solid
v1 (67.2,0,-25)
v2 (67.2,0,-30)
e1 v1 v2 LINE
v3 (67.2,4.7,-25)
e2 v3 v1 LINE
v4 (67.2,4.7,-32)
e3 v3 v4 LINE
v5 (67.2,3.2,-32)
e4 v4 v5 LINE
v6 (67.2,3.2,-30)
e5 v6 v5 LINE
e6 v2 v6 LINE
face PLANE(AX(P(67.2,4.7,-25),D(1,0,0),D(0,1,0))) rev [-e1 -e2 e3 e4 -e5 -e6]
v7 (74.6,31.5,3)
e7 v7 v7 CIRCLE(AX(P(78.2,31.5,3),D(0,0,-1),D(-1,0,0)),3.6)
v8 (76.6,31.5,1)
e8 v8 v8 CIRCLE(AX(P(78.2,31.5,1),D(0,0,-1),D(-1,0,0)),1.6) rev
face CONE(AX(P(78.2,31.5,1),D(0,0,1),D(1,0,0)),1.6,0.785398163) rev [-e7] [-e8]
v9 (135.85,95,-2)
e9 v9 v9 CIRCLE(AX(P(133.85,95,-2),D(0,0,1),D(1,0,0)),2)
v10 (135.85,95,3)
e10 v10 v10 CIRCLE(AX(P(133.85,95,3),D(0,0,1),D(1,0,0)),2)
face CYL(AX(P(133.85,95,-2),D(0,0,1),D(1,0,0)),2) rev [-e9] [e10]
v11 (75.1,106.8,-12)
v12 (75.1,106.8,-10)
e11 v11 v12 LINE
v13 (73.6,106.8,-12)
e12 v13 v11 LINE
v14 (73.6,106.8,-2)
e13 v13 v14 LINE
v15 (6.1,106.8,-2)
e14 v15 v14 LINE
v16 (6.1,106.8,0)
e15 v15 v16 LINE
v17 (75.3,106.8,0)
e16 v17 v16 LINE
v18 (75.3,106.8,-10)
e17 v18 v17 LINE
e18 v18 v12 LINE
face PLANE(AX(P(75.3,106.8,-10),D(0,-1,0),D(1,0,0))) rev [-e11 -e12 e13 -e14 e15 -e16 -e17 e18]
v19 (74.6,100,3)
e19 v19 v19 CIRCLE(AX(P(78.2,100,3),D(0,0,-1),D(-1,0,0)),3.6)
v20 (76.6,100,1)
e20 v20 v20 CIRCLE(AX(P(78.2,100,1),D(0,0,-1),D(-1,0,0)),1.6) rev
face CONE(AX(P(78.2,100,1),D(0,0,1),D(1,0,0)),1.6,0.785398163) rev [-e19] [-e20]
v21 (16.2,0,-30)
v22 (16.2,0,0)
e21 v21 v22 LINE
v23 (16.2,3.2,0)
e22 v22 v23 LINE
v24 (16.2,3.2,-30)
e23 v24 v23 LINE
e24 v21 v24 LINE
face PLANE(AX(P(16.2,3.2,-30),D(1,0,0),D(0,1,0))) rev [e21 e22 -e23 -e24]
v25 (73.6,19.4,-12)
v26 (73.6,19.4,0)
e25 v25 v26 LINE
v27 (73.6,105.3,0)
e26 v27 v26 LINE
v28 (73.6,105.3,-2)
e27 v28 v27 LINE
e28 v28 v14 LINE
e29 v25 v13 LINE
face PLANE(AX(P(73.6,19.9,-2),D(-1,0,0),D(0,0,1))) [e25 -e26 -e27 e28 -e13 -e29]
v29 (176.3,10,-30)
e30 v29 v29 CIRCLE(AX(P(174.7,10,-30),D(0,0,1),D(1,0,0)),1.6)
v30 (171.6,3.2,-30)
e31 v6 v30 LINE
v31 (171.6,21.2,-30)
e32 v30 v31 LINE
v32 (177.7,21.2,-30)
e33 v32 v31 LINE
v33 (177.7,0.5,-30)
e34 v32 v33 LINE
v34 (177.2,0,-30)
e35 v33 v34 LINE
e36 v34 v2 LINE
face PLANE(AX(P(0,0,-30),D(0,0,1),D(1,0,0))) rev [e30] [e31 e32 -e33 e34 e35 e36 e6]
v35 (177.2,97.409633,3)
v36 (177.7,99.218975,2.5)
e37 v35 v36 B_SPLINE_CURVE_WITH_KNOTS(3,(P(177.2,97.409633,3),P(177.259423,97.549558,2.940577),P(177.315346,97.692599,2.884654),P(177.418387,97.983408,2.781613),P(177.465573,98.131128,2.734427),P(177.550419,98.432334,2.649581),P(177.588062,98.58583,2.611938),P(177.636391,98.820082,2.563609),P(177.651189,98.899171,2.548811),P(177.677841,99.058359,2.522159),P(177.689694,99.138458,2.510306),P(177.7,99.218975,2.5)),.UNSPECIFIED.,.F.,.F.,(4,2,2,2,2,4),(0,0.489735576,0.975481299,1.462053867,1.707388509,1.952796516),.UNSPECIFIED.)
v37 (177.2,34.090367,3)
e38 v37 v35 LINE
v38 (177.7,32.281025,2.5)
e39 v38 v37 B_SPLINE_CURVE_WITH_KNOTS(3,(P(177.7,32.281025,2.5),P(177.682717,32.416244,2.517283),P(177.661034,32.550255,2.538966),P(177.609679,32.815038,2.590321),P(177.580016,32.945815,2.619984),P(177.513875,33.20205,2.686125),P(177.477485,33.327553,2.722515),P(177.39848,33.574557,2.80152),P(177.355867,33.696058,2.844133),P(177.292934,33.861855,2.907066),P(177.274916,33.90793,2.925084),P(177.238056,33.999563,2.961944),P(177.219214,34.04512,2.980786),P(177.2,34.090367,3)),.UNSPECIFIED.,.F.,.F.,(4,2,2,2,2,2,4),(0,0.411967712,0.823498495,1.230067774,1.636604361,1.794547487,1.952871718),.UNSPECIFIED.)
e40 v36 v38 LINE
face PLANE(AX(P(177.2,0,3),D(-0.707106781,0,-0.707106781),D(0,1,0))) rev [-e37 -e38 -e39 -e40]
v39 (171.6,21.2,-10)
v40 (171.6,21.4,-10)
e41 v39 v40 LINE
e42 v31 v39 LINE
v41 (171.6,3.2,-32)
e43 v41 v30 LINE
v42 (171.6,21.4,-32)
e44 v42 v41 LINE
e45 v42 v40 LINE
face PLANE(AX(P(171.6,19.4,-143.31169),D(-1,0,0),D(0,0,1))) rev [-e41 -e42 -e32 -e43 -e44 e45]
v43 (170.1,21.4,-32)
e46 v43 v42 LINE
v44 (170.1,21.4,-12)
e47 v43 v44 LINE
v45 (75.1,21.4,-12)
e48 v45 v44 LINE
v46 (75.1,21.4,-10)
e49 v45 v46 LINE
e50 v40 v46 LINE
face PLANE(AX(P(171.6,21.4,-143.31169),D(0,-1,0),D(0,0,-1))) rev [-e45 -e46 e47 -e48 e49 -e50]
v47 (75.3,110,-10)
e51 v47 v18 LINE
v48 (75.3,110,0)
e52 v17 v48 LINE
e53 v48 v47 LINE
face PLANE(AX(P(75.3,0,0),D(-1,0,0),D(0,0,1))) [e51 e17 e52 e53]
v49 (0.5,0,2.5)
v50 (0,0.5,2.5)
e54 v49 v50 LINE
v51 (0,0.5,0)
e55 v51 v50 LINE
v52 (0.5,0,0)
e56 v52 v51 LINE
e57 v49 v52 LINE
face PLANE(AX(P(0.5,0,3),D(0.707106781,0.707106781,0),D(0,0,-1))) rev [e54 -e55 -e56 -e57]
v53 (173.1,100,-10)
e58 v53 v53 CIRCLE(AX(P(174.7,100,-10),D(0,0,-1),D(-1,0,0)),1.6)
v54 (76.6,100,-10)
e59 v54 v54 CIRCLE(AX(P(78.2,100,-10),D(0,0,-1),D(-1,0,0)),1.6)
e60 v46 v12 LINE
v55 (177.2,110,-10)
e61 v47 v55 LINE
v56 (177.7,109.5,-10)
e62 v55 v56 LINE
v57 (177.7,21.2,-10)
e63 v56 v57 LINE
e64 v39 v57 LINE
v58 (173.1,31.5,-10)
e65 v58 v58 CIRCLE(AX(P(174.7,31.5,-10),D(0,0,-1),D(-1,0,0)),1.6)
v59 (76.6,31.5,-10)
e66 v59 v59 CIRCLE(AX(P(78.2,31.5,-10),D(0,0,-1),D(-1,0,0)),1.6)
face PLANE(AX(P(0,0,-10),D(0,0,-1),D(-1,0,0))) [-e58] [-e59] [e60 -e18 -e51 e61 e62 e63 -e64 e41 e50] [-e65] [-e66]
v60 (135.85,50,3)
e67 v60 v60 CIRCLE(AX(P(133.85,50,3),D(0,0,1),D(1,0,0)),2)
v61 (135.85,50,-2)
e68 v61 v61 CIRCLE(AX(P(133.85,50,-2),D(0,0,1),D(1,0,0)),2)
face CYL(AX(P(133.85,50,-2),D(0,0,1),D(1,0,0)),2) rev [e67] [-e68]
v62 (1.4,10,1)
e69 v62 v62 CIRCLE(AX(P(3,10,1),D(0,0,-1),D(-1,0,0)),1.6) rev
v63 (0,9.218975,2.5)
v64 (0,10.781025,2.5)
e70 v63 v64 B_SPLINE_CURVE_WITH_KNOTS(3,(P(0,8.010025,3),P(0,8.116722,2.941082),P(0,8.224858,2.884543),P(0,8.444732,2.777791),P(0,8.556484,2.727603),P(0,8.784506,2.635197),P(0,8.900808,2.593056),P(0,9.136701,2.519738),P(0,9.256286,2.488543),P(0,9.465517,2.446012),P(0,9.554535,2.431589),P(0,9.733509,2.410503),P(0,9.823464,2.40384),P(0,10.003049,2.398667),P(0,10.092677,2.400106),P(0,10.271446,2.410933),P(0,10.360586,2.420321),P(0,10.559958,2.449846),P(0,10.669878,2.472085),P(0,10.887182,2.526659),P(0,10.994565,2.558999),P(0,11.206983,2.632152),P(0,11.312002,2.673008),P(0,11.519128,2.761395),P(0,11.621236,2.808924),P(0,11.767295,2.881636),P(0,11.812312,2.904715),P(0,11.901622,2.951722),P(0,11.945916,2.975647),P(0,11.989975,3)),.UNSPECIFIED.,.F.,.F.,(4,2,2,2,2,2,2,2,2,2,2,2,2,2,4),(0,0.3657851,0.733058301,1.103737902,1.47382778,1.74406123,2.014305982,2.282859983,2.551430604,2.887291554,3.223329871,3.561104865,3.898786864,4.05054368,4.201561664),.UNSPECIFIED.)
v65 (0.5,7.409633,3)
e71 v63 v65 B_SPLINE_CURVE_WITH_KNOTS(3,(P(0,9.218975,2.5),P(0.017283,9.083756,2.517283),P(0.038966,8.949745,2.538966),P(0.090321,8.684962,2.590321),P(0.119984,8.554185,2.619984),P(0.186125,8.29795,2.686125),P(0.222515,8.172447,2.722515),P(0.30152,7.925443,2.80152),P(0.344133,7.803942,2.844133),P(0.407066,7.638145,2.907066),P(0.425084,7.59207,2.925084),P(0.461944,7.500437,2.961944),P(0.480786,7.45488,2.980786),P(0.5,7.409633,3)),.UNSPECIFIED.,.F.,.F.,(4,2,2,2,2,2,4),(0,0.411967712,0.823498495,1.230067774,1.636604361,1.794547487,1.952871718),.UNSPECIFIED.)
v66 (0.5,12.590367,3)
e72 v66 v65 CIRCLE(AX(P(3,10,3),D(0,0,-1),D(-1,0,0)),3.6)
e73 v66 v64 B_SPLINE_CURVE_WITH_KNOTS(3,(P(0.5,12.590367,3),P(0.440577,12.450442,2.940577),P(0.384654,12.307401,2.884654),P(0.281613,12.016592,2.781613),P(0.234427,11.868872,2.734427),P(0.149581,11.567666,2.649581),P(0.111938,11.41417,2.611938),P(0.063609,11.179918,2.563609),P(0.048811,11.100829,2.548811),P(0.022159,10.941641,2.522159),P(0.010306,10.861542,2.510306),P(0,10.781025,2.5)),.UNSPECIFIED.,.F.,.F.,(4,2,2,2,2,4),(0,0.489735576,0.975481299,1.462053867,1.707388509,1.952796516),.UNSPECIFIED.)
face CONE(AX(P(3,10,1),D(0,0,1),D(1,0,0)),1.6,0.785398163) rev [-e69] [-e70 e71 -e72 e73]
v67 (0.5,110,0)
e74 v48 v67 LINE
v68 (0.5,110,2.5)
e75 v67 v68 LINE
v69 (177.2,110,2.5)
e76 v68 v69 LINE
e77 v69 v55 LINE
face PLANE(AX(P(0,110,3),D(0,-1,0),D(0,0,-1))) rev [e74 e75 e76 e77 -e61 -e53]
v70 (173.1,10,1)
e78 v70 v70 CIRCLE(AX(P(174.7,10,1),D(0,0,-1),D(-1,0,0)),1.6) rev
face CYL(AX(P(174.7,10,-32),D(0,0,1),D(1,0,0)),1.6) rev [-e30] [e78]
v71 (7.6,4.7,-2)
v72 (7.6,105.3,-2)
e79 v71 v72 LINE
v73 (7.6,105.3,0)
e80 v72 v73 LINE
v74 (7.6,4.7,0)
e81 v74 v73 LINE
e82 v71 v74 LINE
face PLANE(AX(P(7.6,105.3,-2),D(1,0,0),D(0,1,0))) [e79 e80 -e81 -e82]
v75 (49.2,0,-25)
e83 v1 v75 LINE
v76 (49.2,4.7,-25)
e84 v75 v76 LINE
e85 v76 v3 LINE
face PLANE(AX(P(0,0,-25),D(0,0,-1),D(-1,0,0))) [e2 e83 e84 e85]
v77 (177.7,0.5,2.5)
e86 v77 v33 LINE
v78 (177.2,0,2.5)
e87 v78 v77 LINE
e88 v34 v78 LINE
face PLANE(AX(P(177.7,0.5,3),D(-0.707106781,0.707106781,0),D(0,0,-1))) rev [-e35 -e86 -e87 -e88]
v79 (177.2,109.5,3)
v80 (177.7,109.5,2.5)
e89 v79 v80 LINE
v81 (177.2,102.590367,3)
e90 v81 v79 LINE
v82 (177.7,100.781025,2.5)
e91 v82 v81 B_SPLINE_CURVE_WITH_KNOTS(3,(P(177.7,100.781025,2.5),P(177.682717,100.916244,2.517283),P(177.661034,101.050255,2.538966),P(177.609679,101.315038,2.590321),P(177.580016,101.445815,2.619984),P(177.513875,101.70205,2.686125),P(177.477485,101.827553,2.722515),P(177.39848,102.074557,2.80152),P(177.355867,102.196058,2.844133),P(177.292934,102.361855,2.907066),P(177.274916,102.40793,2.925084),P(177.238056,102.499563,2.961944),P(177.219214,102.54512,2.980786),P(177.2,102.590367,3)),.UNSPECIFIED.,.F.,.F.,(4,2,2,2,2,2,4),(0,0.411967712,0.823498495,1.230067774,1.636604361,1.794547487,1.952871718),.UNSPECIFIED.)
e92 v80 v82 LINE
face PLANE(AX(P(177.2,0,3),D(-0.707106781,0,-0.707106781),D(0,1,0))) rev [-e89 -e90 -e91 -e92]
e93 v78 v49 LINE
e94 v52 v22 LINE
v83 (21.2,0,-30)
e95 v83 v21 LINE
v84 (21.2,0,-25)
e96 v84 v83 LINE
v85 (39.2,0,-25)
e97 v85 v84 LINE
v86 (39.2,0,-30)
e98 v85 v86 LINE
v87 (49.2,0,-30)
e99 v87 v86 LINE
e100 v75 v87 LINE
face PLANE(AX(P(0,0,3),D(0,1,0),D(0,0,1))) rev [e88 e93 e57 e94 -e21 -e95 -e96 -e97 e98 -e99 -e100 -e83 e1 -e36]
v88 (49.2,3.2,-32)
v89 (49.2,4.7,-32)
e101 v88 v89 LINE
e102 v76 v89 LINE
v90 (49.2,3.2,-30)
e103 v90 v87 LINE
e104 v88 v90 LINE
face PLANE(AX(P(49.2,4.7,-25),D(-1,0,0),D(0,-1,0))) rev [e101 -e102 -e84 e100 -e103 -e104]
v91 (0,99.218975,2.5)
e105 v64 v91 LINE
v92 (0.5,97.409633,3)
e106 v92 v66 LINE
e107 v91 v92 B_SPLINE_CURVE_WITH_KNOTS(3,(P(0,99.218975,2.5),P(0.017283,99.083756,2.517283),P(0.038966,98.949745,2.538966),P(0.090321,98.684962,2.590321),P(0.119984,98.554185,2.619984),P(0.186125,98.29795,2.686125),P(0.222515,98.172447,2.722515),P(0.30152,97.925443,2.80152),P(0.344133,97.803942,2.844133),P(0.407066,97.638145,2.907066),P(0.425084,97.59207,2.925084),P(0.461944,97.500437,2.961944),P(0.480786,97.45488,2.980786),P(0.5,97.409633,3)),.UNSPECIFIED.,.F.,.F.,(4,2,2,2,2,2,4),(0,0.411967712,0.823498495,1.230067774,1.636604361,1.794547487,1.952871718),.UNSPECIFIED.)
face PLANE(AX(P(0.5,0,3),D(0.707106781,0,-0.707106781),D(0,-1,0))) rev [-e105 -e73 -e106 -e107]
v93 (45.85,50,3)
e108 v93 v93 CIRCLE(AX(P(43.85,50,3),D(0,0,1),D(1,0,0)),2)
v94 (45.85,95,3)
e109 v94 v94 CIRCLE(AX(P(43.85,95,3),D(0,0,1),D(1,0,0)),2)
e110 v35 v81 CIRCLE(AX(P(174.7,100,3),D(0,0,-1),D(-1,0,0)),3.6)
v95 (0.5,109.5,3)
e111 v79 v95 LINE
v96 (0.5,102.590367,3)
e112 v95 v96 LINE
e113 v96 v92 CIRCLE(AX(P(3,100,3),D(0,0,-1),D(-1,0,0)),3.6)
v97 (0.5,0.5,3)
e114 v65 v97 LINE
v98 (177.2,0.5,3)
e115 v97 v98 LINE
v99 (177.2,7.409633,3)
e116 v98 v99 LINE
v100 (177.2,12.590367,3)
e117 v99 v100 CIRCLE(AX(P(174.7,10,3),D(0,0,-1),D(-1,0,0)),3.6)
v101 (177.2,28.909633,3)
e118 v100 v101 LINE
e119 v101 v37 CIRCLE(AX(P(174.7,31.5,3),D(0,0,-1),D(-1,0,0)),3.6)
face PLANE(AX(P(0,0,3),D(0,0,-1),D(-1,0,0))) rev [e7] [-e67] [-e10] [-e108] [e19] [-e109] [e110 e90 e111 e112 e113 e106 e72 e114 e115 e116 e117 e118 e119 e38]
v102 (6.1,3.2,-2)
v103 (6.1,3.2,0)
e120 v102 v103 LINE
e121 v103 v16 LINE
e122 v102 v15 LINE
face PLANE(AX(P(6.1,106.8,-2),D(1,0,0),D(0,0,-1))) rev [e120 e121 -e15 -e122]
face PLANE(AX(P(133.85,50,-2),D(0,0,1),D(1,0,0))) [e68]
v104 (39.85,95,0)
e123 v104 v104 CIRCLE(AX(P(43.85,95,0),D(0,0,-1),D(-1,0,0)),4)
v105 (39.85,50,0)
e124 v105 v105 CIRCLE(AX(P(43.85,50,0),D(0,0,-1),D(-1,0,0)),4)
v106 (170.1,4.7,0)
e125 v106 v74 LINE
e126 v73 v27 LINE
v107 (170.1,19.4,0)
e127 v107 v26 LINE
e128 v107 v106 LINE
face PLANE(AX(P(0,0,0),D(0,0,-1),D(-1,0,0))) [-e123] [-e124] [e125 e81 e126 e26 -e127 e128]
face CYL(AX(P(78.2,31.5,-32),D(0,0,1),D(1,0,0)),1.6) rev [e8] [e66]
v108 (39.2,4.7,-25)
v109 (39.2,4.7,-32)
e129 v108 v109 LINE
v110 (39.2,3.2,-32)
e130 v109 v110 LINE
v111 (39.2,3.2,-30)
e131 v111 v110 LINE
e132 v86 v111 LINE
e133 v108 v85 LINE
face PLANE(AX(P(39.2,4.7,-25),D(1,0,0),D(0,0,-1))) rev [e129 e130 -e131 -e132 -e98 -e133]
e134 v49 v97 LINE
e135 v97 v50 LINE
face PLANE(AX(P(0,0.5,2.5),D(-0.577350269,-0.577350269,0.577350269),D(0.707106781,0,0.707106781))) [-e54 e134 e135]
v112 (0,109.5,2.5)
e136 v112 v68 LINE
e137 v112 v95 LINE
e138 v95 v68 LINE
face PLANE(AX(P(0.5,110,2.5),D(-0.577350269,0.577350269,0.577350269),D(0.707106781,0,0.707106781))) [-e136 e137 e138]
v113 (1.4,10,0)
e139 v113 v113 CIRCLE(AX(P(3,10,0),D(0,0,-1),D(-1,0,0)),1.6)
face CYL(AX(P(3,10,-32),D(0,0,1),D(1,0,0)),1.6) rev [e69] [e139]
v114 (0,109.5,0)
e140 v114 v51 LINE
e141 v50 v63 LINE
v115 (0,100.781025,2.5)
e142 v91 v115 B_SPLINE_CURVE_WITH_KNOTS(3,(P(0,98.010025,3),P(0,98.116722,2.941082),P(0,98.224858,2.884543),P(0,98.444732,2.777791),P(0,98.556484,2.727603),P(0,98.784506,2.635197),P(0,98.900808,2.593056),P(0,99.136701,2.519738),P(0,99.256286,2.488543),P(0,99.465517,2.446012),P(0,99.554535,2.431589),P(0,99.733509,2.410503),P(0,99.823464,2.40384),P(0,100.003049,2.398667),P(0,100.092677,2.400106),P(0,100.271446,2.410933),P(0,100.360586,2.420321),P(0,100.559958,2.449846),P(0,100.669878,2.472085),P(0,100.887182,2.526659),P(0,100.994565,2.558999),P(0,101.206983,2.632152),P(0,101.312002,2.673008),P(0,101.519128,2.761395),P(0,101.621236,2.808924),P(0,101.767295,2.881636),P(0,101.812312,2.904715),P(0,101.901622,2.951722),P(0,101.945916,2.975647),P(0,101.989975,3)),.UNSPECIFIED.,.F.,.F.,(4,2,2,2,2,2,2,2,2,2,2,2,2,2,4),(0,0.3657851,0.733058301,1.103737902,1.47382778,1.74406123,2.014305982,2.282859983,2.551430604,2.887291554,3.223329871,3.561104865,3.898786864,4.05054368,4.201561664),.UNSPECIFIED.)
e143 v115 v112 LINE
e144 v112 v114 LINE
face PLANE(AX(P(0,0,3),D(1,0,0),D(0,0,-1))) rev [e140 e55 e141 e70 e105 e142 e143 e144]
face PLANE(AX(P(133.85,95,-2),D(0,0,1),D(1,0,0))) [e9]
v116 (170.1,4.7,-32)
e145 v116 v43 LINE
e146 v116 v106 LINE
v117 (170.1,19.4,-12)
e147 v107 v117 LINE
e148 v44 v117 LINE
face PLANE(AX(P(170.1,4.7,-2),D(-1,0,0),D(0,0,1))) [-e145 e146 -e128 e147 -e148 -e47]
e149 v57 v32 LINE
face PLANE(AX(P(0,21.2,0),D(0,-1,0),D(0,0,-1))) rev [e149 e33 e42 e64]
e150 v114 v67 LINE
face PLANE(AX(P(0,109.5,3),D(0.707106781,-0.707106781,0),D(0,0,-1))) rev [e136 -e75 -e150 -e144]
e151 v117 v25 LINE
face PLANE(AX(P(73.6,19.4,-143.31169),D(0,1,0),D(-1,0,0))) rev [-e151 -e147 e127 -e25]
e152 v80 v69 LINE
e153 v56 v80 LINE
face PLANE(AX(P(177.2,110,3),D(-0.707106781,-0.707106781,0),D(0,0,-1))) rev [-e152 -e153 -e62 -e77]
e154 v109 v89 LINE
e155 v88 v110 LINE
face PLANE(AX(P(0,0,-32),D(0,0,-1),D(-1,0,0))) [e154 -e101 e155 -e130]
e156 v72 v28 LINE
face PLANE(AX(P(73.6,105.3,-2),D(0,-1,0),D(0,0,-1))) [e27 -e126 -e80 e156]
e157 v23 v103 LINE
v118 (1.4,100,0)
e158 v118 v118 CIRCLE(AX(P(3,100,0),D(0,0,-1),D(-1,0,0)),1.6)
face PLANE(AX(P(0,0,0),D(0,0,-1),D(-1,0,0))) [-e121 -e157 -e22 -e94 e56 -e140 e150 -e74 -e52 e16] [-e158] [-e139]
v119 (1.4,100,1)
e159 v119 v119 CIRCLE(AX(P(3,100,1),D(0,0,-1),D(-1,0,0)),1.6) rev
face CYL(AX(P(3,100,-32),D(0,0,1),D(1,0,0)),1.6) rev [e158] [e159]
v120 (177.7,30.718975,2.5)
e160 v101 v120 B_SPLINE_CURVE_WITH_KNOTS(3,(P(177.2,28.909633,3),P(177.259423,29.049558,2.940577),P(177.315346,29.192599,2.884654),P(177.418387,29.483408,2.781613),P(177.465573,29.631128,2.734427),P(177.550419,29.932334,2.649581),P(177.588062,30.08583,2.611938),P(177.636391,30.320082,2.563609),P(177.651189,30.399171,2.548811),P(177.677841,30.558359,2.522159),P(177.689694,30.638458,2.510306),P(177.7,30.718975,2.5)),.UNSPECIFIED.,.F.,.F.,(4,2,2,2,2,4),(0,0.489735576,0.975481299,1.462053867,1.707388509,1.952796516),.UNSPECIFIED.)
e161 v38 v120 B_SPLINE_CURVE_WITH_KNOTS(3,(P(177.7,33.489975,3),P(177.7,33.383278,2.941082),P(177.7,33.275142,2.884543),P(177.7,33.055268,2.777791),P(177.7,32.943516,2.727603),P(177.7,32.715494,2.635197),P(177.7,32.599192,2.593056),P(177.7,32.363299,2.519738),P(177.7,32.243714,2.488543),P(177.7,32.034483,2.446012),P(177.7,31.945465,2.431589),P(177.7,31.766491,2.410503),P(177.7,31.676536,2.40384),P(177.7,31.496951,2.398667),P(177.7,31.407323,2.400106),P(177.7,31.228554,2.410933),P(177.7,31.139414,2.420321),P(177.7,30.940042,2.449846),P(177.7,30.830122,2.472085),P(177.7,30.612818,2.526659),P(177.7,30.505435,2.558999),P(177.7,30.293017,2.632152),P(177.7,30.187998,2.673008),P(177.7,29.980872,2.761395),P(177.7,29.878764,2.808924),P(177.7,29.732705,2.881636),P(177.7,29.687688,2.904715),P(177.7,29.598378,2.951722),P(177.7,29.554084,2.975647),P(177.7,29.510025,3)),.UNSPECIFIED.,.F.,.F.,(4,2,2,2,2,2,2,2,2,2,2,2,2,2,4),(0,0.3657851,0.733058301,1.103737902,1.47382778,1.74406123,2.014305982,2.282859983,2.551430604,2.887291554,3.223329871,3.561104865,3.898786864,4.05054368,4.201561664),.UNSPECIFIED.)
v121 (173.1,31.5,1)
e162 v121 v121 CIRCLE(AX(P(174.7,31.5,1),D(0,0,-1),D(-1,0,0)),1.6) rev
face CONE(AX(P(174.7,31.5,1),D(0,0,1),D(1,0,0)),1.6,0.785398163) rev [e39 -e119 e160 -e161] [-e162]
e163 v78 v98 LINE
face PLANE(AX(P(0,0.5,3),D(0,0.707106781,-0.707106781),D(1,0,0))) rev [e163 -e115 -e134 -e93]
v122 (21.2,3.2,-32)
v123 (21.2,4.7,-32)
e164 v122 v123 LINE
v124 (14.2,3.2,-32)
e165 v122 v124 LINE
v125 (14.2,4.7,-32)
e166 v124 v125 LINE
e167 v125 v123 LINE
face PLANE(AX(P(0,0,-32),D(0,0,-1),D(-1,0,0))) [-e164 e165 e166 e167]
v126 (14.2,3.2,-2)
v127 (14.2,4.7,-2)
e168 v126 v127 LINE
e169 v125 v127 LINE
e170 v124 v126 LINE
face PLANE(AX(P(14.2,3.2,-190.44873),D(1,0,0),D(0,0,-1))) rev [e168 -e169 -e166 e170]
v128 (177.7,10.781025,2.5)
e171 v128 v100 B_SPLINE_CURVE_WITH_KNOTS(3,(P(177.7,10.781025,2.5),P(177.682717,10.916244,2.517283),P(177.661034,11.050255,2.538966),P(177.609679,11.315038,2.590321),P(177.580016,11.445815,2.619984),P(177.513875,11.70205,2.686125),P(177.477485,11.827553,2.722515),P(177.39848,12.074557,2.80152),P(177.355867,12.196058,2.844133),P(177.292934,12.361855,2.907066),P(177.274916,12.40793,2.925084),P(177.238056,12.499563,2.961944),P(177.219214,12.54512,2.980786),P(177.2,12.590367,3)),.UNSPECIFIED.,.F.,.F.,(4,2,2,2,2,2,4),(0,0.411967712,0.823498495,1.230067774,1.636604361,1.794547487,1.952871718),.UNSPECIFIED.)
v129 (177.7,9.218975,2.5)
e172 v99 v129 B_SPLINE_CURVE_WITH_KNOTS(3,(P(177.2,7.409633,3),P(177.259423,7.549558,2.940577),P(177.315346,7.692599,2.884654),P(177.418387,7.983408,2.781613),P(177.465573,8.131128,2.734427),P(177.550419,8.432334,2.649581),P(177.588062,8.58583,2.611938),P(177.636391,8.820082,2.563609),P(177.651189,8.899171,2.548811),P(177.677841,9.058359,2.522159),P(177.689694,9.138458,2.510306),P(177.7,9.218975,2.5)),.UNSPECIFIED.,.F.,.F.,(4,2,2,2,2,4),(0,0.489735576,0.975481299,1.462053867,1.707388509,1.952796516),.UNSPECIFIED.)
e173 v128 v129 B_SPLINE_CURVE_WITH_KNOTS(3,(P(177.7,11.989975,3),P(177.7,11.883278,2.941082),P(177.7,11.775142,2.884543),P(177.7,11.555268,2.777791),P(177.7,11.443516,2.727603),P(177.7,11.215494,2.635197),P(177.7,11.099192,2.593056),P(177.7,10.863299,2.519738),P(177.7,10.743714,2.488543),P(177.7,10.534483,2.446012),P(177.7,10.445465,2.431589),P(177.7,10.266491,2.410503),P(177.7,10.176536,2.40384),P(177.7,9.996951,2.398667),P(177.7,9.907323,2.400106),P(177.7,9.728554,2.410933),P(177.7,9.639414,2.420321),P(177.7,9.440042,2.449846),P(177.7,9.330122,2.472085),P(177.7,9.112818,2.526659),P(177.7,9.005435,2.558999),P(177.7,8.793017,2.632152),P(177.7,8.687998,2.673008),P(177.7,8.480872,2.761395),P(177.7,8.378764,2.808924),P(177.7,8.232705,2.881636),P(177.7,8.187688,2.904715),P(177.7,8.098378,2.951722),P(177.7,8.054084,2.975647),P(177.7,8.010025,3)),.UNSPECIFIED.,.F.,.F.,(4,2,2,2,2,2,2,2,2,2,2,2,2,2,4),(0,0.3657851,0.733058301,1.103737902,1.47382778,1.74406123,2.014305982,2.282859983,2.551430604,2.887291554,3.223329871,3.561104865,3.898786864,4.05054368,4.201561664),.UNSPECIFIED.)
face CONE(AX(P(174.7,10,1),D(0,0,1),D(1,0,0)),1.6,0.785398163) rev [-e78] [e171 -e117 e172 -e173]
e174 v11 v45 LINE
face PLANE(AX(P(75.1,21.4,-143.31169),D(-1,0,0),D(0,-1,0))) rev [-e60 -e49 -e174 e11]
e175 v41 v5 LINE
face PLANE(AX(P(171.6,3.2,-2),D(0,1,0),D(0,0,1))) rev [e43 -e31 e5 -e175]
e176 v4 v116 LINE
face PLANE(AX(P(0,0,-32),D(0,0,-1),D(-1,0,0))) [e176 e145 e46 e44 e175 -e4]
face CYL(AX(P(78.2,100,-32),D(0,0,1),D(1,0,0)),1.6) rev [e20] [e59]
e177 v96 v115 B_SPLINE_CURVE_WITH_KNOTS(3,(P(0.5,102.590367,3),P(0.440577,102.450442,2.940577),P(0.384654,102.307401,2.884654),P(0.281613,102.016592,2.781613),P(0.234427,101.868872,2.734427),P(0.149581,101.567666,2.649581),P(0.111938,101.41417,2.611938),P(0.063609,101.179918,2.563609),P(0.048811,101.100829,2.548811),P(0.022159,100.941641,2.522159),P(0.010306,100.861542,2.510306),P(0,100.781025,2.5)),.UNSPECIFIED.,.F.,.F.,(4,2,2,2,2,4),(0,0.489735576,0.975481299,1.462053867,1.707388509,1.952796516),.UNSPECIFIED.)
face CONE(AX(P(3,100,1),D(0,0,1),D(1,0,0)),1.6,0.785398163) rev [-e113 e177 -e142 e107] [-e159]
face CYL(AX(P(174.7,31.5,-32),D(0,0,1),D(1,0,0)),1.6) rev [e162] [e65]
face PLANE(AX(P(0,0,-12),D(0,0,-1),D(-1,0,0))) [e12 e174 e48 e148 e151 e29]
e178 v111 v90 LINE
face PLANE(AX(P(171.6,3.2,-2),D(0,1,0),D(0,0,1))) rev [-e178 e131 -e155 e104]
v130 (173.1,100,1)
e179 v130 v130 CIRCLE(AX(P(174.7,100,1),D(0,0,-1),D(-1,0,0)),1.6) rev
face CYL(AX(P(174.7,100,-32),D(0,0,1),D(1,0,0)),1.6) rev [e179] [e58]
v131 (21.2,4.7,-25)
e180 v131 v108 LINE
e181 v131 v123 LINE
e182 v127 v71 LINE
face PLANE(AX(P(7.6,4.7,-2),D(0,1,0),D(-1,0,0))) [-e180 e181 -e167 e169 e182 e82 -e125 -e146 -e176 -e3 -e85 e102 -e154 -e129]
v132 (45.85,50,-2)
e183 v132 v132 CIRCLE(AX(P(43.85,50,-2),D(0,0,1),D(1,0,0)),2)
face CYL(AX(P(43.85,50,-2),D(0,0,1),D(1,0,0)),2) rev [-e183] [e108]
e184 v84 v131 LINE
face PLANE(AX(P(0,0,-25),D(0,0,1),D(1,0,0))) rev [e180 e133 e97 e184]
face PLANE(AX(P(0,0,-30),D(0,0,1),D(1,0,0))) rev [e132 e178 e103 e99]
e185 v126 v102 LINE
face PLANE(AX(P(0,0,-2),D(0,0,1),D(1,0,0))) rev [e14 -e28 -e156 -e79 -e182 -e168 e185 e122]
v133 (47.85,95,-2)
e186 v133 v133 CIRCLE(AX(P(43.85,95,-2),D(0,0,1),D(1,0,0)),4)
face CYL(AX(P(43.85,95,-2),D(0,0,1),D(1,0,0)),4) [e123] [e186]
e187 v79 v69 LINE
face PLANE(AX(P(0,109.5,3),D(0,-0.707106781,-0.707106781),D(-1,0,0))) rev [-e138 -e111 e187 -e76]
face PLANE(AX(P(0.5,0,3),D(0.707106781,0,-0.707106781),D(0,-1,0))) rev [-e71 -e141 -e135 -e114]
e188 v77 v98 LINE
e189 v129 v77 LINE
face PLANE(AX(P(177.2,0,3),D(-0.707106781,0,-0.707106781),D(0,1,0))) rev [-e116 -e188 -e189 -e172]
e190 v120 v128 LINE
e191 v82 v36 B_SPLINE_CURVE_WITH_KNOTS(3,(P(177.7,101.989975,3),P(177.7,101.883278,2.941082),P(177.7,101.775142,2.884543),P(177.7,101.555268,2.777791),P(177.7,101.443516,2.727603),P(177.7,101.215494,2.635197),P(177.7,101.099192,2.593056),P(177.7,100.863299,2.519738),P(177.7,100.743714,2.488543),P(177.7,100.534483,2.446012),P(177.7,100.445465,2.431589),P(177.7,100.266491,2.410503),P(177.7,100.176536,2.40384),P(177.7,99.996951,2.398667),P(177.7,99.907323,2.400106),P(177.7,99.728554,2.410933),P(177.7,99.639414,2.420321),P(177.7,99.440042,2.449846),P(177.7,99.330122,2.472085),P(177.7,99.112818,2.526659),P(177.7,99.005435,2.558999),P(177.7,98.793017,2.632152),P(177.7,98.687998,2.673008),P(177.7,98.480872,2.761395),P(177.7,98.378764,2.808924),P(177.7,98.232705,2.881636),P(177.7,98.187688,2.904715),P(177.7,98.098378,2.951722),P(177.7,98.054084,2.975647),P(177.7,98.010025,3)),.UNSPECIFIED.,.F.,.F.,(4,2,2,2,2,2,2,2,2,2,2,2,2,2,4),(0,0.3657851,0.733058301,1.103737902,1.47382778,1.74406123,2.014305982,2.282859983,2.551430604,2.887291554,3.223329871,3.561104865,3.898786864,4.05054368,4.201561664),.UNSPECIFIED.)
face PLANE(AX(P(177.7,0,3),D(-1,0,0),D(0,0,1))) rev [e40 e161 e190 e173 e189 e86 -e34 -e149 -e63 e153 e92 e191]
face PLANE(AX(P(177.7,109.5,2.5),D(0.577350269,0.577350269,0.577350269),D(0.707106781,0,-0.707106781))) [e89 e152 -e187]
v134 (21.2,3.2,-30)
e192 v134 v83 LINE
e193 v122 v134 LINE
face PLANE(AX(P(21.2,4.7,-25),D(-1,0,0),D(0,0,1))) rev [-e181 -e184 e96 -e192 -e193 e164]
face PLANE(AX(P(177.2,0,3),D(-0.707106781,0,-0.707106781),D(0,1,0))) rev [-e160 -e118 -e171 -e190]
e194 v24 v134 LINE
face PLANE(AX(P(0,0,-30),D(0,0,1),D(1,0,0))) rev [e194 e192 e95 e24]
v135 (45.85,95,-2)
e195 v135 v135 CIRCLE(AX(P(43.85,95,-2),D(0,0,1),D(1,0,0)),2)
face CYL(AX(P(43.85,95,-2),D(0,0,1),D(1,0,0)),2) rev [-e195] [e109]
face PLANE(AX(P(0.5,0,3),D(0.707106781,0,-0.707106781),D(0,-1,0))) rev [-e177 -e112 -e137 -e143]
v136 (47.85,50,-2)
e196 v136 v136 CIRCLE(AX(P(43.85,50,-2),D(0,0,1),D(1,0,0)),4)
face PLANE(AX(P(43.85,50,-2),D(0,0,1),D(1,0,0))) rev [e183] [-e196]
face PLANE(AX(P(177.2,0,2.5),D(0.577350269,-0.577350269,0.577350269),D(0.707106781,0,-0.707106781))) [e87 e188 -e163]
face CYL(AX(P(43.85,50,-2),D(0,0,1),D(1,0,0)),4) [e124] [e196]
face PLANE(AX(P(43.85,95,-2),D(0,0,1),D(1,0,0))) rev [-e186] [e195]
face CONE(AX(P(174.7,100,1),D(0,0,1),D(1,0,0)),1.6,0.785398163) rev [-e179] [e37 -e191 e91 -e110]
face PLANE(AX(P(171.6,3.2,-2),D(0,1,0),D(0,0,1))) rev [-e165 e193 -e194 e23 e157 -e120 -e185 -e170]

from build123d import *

# Parameters (mm, degrees)
ESQUISSE1_W             = 177.7
ESQUISSE1_H             = 110
BOSS_EXTRU_1_DEPTH      = 3
ESQUISSE2_W             = 102.6
ESQUISSE2_H             = 88.6
BOSS_EXTRU_2_DEPTH      = 10
BOSS_EXTRU_3_DEPTH      = 30
ESQUISSE4_W             = 6.1
ESQUISSE4_H             = 20
ENL_V_MAT_EXTRU_1_DEPTH = 0.2
ESQUISSE5_W             = 10
ESQUISSE5_H             = 3.2
ENL_V_MAT_EXTRU_2_DEPTH = 0.2
BOSS_EXTRU_4_DEPTH      = 2
BOSS_EXTRU_5_DEPTH      = 10
BOSS_EXTRU_6_DEPTH      = 30
ESQUISSE9_R             = 1.6
ENL_V_MAT_EXTRU_3_DEPTH = 212.901604524
CHANFREIN1_SIZE         = 2
CHANFREIN2_SIZE         = 0.5
ESQUISSE10_R            = 2
ENL_V_MAT_EXTRU_4_DEPTH = 5
ESQUISSE11_R            = 4
ESQUISSE11_R_2          = 2
BOSS_EXTRU_7_DEPTH      = 5
ESQUISSE13_W            = 18
ESQUISSE13_H            = 4.7
ENL_V_MAT_EXTRU_5_DEPTH = 7
ESQUISSE14_W            = 96.5
ESQUISSE14_H            = 0.5
BOSS_EXTRU_8_DEPTH      = 2


with BuildPart() as part:
    # Esquisse1 → Boss.-Extru.1 (new body)
    with BuildSketch(Plane.XY):
        with Locations((88.85, 55)):
            Rectangle(ESQUISSE1_W, ESQUISSE1_H)
    extrude(amount=BOSS_EXTRU_1_DEPTH)

    # Esquisse2 → Boss.-Extru.2 (add)
    with BuildSketch(Plane(origin=(0, 0, 0), x_dir=(-1, 0, 0), z_dir=(0, 0, -1))):
        with Locations((-126.4, 65.7)):
            Rectangle(ESQUISSE2_W, ESQUISSE2_H)
    extrude(amount=BOSS_EXTRU_2_DEPTH)

    # Esquisse3 → Boss.-Extru.3 (add)
    with BuildSketch(Plane(origin=(0, 0, 0), x_dir=(-1, 0, 0), z_dir=(0, 0, -1))):
        Polygon((-177.7, 21.4), (-171.6, 21.4), (-171.6, 3.2), (-16.2, 3.2), (-16.2, 0), (-177.7, 0), align=None)
    extrude(amount=BOSS_EXTRU_3_DEPTH)

    # Esquisse4 → Enlèv. mat.-Extru.1 (cut)
    with BuildSketch(Plane(origin=(0, 21.4, 0), x_dir=(1, 0, 0), z_dir=(0, 1, 0))):
        with Locations((174.65, 20)):
            Rectangle(ESQUISSE4_W, ESQUISSE4_H)
    extrude(amount=-ENL_V_MAT_EXTRU_1_DEPTH, mode=Mode.SUBTRACT)

    # Esquisse5 → Enlèv. mat.-Extru.2 (cut)
    with BuildSketch(Plane.ZY.offset(-75.1)):
        with Locations((-5, 108.4)):
            Rectangle(ESQUISSE5_W, ESQUISSE5_H)
    extrude(amount=-ENL_V_MAT_EXTRU_2_DEPTH, mode=Mode.SUBTRACT)

    # Esquisse6 → Boss.-Extru.4 (add)
    with BuildSketch(Plane(origin=(0, 0, 0), x_dir=(-1, 0, 0), z_dir=(0, 0, -1))):
        Polygon((-75.1, 106.8), (-6.1, 106.8), (-6.1, 3.2), (-171.6, 3.2), (-171.6, 21.4), (-75.1, 21.4), align=None)
        Polygon((-73.6, 105.3), (-7.6, 105.3), (-7.6, 4.7), (-170.1, 4.7), (-170.1, 19.9), (-73.6, 19.9), align=None, mode=Mode.SUBTRACT)
    extrude(amount=BOSS_EXTRU_4_DEPTH)

    # Esquisse7 → Boss.-Extru.5 (add)
    with BuildSketch(Plane(origin=(0, 0, -2), x_dir=(-1, 0, 0), z_dir=(0, 0, -1))):
        Polygon((-75.1, 106.8), (-73.6, 106.8), (-73.6, 19.4), (-171.6, 19.4), (-171.6, 21.4), (-75.1, 21.4), align=None)
    extrude(amount=BOSS_EXTRU_5_DEPTH)

    # Esquisse8 → Boss.-Extru.6 (add)
    with BuildSketch(Plane(origin=(0, 0, -2), x_dir=(-1, 0, 0), z_dir=(0, 0, -1))):
        Polygon((-14.2, 3.2), (-14.2, 4.7), (-170.1, 4.7), (-170.1, 21.4), (-171.6, 21.4), (-171.6, 3.2), align=None)
    extrude(amount=BOSS_EXTRU_6_DEPTH)

    # Esquisse9 → Enlèv. mat.-Extru.3 (cut, through all)
    with BuildSketch(Plane.XY.offset(3)):
        with Locations((3, 100)):
            Circle(ESQUISSE9_R)
        with Locations((3, 10)):
            Circle(ESQUISSE9_R)
        with Locations((174.7, 100)):
            Circle(ESQUISSE9_R)
        with Locations((174.7, 10)):
            Circle(ESQUISSE9_R)
        with Locations((78.2, 100)):
            Circle(ESQUISSE9_R)
        with Locations((78.2, 31.5)):
            Circle(ESQUISSE9_R)
        with Locations((174.7, 31.5)):
            Circle(ESQUISSE9_R)
    extrude(amount=-ENL_V_MAT_EXTRU_3_DEPTH, mode=Mode.SUBTRACT)

    # Chanfrein1
    # the kernel refuses this chamfer: 2 mm, written as the material it takes off along each edge
    with BuildSketch(Plane(origin=(78.2, 100, 3), x_dir=(1, 0, 0), z_dir=(0, -1, 0))) as chanfrein1_piece_1:
        Polygon((1.6 + CHANFREIN1_SIZE, 0), (1.6, -CHANFREIN1_SIZE), (1.6, 0), align=None)
    revolve(axis=Axis((78.2, 100, 3), (0, 0, 1)), mode=Mode.SUBTRACT)
    with BuildSketch(Plane(origin=(174.7, 10, 3), x_dir=(1, 0, 0), z_dir=(0, -1, 0))) as chanfrein1_piece_2:
        Polygon((1.6 + CHANFREIN1_SIZE, 0), (1.6, -CHANFREIN1_SIZE), (1.6, 0), align=None)
    revolve(axis=Axis((174.7, 10, 3), (0, 0, 1)), mode=Mode.SUBTRACT)
    with BuildSketch(Plane(origin=(174.7, 100, 3), x_dir=(1, 0, 0), z_dir=(0, -1, 0))) as chanfrein1_piece_3:
        Polygon((1.6 + CHANFREIN1_SIZE, 0), (1.6, -CHANFREIN1_SIZE), (1.6, 0), align=None)
    revolve(axis=Axis((174.7, 100, 3), (0, 0, 1)), mode=Mode.SUBTRACT)
    with BuildSketch(Plane(origin=(3, 10, 3), x_dir=(1, 0, 0), z_dir=(0, -1, 0))) as chanfrein1_piece_4:
        Polygon((1.6 + CHANFREIN1_SIZE, 0), (1.6, -CHANFREIN1_SIZE), (1.6, 0), align=None)
    revolve(axis=Axis((3, 10, 3), (0, 0, 1)), mode=Mode.SUBTRACT)
    with BuildSketch(Plane(origin=(78.2, 31.5, 3), x_dir=(1, 0, 0), z_dir=(0, -1, 0))) as chanfrein1_piece_5:
        Polygon((1.6 + CHANFREIN1_SIZE, 0), (1.6, -CHANFREIN1_SIZE), (1.6, 0), align=None)
    revolve(axis=Axis((78.2, 31.5, 3), (0, 0, 1)), mode=Mode.SUBTRACT)
    with BuildSketch(Plane(origin=(174.7, 31.5, 3), x_dir=(1, 0, 0), z_dir=(0, -1, 0))) as chanfrein1_piece_6:
        Polygon((1.6 + CHANFREIN1_SIZE, 0), (1.6, -CHANFREIN1_SIZE), (1.6, 0), align=None)
    revolve(axis=Axis((174.7, 31.5, 3), (0, 0, 1)), mode=Mode.SUBTRACT)
    with BuildSketch(Plane(origin=(3, 100, 3), x_dir=(1, 0, 0), z_dir=(0, -1, 0))) as chanfrein1_piece_7:
        Polygon((1.6 + CHANFREIN1_SIZE, 0), (1.6, -CHANFREIN1_SIZE), (1.6, 0), align=None)
    revolve(axis=Axis((3, 100, 3), (0, 0, 1)), mode=Mode.SUBTRACT)

    # Chanfrein2
    chanfrein2_edges = [part.edges().sort_by_distance(p)[0] for p in [
        (177.7, 65.75, 3),
        (177.7, 20.75, 3),
        (0, 4.005012563, 3),
        (177.7, 4.005012563, 3),
        (88.85, 0, 3),
        (0, 55, 3),
        (177.7, 105.994987437, 3),
        (0, 105.994987437, 3),
        (88.85, 110, 3),
        (0, 0, 1.5),
        (177.7, 0, -13.5),
        (0, 110, 1.5),
        (177.7, 110, -3.5),
    ]]
    chamfer(chanfrein2_edges, length=CHANFREIN2_SIZE)

    # Esquisse10 → Enlèv. mat.-Extru.4 (cut)
    with BuildSketch(Plane.XY.offset(3)):
        with Locations((43.85, 95)):
            Circle(ESQUISSE10_R)
        with Locations((43.85, 50)):
            Circle(ESQUISSE10_R)
        with Locations((133.85, 95)):
            Circle(ESQUISSE10_R)
        with Locations((133.85, 50)):
            Circle(ESQUISSE10_R)
    extrude(amount=-ENL_V_MAT_EXTRU_4_DEPTH, mode=Mode.SUBTRACT)

    # Esquisse11 → Boss.-Extru.7 (add)
    # profile 1 of 4: a face of its own
    with BuildSketch(Plane.XY.offset(3)):
        with Locations((43.85, 95)):
            Circle(ESQUISSE11_R)
        with Locations((43.85, 95)):
            Circle(ESQUISSE11_R_2, mode=Mode.SUBTRACT)
    # profile 2 of 4: a face of its own
    with BuildSketch(Plane.XY.offset(3)):
        with Locations((43.85, 50)):
            Circle(ESQUISSE11_R)
        with Locations((43.85, 50)):
            Circle(ESQUISSE11_R_2, mode=Mode.SUBTRACT)
    # profile 3 of 4: a face of its own
    with BuildSketch(Plane.XY.offset(3)):
        with Locations((133.85, 95)):
            Circle(ESQUISSE11_R)
        with Locations((133.85, 95)):
            Circle(ESQUISSE11_R_2, mode=Mode.SUBTRACT)
    # profile 4 of 4: a face of its own
    with BuildSketch(Plane.XY.offset(3)):
        with Locations((133.85, 50)):
            Circle(ESQUISSE11_R)
        with Locations((133.85, 50)):
            Circle(ESQUISSE11_R_2, mode=Mode.SUBTRACT)
    extrude(amount=-BOSS_EXTRU_7_DEPTH)

    # Esquisse13 → Enlèv. mat.-Extru.5 (cut)
    with BuildSketch(Plane(origin=(0, 0, -32), x_dir=(-1, 0, 0), z_dir=(0, 0, -1))):
        with Locations((-30.2, 2.35)):
            Rectangle(ESQUISSE13_W, ESQUISSE13_H)
        with Locations((-58.2, 2.35)):
            Rectangle(ESQUISSE13_W, ESQUISSE13_H)
    extrude(amount=-ENL_V_MAT_EXTRU_5_DEPTH, mode=Mode.SUBTRACT)

    # Esquisse14 → Boss.-Extru.8 (add)
    with BuildSketch(Plane.XY.offset(-2)):
        with Locations((121.85, 19.65)):
            Rectangle(ESQUISSE14_W, ESQUISSE14_H)
    extrude(amount=BOSS_EXTRU_8_DEPTH)


solid = part.part
